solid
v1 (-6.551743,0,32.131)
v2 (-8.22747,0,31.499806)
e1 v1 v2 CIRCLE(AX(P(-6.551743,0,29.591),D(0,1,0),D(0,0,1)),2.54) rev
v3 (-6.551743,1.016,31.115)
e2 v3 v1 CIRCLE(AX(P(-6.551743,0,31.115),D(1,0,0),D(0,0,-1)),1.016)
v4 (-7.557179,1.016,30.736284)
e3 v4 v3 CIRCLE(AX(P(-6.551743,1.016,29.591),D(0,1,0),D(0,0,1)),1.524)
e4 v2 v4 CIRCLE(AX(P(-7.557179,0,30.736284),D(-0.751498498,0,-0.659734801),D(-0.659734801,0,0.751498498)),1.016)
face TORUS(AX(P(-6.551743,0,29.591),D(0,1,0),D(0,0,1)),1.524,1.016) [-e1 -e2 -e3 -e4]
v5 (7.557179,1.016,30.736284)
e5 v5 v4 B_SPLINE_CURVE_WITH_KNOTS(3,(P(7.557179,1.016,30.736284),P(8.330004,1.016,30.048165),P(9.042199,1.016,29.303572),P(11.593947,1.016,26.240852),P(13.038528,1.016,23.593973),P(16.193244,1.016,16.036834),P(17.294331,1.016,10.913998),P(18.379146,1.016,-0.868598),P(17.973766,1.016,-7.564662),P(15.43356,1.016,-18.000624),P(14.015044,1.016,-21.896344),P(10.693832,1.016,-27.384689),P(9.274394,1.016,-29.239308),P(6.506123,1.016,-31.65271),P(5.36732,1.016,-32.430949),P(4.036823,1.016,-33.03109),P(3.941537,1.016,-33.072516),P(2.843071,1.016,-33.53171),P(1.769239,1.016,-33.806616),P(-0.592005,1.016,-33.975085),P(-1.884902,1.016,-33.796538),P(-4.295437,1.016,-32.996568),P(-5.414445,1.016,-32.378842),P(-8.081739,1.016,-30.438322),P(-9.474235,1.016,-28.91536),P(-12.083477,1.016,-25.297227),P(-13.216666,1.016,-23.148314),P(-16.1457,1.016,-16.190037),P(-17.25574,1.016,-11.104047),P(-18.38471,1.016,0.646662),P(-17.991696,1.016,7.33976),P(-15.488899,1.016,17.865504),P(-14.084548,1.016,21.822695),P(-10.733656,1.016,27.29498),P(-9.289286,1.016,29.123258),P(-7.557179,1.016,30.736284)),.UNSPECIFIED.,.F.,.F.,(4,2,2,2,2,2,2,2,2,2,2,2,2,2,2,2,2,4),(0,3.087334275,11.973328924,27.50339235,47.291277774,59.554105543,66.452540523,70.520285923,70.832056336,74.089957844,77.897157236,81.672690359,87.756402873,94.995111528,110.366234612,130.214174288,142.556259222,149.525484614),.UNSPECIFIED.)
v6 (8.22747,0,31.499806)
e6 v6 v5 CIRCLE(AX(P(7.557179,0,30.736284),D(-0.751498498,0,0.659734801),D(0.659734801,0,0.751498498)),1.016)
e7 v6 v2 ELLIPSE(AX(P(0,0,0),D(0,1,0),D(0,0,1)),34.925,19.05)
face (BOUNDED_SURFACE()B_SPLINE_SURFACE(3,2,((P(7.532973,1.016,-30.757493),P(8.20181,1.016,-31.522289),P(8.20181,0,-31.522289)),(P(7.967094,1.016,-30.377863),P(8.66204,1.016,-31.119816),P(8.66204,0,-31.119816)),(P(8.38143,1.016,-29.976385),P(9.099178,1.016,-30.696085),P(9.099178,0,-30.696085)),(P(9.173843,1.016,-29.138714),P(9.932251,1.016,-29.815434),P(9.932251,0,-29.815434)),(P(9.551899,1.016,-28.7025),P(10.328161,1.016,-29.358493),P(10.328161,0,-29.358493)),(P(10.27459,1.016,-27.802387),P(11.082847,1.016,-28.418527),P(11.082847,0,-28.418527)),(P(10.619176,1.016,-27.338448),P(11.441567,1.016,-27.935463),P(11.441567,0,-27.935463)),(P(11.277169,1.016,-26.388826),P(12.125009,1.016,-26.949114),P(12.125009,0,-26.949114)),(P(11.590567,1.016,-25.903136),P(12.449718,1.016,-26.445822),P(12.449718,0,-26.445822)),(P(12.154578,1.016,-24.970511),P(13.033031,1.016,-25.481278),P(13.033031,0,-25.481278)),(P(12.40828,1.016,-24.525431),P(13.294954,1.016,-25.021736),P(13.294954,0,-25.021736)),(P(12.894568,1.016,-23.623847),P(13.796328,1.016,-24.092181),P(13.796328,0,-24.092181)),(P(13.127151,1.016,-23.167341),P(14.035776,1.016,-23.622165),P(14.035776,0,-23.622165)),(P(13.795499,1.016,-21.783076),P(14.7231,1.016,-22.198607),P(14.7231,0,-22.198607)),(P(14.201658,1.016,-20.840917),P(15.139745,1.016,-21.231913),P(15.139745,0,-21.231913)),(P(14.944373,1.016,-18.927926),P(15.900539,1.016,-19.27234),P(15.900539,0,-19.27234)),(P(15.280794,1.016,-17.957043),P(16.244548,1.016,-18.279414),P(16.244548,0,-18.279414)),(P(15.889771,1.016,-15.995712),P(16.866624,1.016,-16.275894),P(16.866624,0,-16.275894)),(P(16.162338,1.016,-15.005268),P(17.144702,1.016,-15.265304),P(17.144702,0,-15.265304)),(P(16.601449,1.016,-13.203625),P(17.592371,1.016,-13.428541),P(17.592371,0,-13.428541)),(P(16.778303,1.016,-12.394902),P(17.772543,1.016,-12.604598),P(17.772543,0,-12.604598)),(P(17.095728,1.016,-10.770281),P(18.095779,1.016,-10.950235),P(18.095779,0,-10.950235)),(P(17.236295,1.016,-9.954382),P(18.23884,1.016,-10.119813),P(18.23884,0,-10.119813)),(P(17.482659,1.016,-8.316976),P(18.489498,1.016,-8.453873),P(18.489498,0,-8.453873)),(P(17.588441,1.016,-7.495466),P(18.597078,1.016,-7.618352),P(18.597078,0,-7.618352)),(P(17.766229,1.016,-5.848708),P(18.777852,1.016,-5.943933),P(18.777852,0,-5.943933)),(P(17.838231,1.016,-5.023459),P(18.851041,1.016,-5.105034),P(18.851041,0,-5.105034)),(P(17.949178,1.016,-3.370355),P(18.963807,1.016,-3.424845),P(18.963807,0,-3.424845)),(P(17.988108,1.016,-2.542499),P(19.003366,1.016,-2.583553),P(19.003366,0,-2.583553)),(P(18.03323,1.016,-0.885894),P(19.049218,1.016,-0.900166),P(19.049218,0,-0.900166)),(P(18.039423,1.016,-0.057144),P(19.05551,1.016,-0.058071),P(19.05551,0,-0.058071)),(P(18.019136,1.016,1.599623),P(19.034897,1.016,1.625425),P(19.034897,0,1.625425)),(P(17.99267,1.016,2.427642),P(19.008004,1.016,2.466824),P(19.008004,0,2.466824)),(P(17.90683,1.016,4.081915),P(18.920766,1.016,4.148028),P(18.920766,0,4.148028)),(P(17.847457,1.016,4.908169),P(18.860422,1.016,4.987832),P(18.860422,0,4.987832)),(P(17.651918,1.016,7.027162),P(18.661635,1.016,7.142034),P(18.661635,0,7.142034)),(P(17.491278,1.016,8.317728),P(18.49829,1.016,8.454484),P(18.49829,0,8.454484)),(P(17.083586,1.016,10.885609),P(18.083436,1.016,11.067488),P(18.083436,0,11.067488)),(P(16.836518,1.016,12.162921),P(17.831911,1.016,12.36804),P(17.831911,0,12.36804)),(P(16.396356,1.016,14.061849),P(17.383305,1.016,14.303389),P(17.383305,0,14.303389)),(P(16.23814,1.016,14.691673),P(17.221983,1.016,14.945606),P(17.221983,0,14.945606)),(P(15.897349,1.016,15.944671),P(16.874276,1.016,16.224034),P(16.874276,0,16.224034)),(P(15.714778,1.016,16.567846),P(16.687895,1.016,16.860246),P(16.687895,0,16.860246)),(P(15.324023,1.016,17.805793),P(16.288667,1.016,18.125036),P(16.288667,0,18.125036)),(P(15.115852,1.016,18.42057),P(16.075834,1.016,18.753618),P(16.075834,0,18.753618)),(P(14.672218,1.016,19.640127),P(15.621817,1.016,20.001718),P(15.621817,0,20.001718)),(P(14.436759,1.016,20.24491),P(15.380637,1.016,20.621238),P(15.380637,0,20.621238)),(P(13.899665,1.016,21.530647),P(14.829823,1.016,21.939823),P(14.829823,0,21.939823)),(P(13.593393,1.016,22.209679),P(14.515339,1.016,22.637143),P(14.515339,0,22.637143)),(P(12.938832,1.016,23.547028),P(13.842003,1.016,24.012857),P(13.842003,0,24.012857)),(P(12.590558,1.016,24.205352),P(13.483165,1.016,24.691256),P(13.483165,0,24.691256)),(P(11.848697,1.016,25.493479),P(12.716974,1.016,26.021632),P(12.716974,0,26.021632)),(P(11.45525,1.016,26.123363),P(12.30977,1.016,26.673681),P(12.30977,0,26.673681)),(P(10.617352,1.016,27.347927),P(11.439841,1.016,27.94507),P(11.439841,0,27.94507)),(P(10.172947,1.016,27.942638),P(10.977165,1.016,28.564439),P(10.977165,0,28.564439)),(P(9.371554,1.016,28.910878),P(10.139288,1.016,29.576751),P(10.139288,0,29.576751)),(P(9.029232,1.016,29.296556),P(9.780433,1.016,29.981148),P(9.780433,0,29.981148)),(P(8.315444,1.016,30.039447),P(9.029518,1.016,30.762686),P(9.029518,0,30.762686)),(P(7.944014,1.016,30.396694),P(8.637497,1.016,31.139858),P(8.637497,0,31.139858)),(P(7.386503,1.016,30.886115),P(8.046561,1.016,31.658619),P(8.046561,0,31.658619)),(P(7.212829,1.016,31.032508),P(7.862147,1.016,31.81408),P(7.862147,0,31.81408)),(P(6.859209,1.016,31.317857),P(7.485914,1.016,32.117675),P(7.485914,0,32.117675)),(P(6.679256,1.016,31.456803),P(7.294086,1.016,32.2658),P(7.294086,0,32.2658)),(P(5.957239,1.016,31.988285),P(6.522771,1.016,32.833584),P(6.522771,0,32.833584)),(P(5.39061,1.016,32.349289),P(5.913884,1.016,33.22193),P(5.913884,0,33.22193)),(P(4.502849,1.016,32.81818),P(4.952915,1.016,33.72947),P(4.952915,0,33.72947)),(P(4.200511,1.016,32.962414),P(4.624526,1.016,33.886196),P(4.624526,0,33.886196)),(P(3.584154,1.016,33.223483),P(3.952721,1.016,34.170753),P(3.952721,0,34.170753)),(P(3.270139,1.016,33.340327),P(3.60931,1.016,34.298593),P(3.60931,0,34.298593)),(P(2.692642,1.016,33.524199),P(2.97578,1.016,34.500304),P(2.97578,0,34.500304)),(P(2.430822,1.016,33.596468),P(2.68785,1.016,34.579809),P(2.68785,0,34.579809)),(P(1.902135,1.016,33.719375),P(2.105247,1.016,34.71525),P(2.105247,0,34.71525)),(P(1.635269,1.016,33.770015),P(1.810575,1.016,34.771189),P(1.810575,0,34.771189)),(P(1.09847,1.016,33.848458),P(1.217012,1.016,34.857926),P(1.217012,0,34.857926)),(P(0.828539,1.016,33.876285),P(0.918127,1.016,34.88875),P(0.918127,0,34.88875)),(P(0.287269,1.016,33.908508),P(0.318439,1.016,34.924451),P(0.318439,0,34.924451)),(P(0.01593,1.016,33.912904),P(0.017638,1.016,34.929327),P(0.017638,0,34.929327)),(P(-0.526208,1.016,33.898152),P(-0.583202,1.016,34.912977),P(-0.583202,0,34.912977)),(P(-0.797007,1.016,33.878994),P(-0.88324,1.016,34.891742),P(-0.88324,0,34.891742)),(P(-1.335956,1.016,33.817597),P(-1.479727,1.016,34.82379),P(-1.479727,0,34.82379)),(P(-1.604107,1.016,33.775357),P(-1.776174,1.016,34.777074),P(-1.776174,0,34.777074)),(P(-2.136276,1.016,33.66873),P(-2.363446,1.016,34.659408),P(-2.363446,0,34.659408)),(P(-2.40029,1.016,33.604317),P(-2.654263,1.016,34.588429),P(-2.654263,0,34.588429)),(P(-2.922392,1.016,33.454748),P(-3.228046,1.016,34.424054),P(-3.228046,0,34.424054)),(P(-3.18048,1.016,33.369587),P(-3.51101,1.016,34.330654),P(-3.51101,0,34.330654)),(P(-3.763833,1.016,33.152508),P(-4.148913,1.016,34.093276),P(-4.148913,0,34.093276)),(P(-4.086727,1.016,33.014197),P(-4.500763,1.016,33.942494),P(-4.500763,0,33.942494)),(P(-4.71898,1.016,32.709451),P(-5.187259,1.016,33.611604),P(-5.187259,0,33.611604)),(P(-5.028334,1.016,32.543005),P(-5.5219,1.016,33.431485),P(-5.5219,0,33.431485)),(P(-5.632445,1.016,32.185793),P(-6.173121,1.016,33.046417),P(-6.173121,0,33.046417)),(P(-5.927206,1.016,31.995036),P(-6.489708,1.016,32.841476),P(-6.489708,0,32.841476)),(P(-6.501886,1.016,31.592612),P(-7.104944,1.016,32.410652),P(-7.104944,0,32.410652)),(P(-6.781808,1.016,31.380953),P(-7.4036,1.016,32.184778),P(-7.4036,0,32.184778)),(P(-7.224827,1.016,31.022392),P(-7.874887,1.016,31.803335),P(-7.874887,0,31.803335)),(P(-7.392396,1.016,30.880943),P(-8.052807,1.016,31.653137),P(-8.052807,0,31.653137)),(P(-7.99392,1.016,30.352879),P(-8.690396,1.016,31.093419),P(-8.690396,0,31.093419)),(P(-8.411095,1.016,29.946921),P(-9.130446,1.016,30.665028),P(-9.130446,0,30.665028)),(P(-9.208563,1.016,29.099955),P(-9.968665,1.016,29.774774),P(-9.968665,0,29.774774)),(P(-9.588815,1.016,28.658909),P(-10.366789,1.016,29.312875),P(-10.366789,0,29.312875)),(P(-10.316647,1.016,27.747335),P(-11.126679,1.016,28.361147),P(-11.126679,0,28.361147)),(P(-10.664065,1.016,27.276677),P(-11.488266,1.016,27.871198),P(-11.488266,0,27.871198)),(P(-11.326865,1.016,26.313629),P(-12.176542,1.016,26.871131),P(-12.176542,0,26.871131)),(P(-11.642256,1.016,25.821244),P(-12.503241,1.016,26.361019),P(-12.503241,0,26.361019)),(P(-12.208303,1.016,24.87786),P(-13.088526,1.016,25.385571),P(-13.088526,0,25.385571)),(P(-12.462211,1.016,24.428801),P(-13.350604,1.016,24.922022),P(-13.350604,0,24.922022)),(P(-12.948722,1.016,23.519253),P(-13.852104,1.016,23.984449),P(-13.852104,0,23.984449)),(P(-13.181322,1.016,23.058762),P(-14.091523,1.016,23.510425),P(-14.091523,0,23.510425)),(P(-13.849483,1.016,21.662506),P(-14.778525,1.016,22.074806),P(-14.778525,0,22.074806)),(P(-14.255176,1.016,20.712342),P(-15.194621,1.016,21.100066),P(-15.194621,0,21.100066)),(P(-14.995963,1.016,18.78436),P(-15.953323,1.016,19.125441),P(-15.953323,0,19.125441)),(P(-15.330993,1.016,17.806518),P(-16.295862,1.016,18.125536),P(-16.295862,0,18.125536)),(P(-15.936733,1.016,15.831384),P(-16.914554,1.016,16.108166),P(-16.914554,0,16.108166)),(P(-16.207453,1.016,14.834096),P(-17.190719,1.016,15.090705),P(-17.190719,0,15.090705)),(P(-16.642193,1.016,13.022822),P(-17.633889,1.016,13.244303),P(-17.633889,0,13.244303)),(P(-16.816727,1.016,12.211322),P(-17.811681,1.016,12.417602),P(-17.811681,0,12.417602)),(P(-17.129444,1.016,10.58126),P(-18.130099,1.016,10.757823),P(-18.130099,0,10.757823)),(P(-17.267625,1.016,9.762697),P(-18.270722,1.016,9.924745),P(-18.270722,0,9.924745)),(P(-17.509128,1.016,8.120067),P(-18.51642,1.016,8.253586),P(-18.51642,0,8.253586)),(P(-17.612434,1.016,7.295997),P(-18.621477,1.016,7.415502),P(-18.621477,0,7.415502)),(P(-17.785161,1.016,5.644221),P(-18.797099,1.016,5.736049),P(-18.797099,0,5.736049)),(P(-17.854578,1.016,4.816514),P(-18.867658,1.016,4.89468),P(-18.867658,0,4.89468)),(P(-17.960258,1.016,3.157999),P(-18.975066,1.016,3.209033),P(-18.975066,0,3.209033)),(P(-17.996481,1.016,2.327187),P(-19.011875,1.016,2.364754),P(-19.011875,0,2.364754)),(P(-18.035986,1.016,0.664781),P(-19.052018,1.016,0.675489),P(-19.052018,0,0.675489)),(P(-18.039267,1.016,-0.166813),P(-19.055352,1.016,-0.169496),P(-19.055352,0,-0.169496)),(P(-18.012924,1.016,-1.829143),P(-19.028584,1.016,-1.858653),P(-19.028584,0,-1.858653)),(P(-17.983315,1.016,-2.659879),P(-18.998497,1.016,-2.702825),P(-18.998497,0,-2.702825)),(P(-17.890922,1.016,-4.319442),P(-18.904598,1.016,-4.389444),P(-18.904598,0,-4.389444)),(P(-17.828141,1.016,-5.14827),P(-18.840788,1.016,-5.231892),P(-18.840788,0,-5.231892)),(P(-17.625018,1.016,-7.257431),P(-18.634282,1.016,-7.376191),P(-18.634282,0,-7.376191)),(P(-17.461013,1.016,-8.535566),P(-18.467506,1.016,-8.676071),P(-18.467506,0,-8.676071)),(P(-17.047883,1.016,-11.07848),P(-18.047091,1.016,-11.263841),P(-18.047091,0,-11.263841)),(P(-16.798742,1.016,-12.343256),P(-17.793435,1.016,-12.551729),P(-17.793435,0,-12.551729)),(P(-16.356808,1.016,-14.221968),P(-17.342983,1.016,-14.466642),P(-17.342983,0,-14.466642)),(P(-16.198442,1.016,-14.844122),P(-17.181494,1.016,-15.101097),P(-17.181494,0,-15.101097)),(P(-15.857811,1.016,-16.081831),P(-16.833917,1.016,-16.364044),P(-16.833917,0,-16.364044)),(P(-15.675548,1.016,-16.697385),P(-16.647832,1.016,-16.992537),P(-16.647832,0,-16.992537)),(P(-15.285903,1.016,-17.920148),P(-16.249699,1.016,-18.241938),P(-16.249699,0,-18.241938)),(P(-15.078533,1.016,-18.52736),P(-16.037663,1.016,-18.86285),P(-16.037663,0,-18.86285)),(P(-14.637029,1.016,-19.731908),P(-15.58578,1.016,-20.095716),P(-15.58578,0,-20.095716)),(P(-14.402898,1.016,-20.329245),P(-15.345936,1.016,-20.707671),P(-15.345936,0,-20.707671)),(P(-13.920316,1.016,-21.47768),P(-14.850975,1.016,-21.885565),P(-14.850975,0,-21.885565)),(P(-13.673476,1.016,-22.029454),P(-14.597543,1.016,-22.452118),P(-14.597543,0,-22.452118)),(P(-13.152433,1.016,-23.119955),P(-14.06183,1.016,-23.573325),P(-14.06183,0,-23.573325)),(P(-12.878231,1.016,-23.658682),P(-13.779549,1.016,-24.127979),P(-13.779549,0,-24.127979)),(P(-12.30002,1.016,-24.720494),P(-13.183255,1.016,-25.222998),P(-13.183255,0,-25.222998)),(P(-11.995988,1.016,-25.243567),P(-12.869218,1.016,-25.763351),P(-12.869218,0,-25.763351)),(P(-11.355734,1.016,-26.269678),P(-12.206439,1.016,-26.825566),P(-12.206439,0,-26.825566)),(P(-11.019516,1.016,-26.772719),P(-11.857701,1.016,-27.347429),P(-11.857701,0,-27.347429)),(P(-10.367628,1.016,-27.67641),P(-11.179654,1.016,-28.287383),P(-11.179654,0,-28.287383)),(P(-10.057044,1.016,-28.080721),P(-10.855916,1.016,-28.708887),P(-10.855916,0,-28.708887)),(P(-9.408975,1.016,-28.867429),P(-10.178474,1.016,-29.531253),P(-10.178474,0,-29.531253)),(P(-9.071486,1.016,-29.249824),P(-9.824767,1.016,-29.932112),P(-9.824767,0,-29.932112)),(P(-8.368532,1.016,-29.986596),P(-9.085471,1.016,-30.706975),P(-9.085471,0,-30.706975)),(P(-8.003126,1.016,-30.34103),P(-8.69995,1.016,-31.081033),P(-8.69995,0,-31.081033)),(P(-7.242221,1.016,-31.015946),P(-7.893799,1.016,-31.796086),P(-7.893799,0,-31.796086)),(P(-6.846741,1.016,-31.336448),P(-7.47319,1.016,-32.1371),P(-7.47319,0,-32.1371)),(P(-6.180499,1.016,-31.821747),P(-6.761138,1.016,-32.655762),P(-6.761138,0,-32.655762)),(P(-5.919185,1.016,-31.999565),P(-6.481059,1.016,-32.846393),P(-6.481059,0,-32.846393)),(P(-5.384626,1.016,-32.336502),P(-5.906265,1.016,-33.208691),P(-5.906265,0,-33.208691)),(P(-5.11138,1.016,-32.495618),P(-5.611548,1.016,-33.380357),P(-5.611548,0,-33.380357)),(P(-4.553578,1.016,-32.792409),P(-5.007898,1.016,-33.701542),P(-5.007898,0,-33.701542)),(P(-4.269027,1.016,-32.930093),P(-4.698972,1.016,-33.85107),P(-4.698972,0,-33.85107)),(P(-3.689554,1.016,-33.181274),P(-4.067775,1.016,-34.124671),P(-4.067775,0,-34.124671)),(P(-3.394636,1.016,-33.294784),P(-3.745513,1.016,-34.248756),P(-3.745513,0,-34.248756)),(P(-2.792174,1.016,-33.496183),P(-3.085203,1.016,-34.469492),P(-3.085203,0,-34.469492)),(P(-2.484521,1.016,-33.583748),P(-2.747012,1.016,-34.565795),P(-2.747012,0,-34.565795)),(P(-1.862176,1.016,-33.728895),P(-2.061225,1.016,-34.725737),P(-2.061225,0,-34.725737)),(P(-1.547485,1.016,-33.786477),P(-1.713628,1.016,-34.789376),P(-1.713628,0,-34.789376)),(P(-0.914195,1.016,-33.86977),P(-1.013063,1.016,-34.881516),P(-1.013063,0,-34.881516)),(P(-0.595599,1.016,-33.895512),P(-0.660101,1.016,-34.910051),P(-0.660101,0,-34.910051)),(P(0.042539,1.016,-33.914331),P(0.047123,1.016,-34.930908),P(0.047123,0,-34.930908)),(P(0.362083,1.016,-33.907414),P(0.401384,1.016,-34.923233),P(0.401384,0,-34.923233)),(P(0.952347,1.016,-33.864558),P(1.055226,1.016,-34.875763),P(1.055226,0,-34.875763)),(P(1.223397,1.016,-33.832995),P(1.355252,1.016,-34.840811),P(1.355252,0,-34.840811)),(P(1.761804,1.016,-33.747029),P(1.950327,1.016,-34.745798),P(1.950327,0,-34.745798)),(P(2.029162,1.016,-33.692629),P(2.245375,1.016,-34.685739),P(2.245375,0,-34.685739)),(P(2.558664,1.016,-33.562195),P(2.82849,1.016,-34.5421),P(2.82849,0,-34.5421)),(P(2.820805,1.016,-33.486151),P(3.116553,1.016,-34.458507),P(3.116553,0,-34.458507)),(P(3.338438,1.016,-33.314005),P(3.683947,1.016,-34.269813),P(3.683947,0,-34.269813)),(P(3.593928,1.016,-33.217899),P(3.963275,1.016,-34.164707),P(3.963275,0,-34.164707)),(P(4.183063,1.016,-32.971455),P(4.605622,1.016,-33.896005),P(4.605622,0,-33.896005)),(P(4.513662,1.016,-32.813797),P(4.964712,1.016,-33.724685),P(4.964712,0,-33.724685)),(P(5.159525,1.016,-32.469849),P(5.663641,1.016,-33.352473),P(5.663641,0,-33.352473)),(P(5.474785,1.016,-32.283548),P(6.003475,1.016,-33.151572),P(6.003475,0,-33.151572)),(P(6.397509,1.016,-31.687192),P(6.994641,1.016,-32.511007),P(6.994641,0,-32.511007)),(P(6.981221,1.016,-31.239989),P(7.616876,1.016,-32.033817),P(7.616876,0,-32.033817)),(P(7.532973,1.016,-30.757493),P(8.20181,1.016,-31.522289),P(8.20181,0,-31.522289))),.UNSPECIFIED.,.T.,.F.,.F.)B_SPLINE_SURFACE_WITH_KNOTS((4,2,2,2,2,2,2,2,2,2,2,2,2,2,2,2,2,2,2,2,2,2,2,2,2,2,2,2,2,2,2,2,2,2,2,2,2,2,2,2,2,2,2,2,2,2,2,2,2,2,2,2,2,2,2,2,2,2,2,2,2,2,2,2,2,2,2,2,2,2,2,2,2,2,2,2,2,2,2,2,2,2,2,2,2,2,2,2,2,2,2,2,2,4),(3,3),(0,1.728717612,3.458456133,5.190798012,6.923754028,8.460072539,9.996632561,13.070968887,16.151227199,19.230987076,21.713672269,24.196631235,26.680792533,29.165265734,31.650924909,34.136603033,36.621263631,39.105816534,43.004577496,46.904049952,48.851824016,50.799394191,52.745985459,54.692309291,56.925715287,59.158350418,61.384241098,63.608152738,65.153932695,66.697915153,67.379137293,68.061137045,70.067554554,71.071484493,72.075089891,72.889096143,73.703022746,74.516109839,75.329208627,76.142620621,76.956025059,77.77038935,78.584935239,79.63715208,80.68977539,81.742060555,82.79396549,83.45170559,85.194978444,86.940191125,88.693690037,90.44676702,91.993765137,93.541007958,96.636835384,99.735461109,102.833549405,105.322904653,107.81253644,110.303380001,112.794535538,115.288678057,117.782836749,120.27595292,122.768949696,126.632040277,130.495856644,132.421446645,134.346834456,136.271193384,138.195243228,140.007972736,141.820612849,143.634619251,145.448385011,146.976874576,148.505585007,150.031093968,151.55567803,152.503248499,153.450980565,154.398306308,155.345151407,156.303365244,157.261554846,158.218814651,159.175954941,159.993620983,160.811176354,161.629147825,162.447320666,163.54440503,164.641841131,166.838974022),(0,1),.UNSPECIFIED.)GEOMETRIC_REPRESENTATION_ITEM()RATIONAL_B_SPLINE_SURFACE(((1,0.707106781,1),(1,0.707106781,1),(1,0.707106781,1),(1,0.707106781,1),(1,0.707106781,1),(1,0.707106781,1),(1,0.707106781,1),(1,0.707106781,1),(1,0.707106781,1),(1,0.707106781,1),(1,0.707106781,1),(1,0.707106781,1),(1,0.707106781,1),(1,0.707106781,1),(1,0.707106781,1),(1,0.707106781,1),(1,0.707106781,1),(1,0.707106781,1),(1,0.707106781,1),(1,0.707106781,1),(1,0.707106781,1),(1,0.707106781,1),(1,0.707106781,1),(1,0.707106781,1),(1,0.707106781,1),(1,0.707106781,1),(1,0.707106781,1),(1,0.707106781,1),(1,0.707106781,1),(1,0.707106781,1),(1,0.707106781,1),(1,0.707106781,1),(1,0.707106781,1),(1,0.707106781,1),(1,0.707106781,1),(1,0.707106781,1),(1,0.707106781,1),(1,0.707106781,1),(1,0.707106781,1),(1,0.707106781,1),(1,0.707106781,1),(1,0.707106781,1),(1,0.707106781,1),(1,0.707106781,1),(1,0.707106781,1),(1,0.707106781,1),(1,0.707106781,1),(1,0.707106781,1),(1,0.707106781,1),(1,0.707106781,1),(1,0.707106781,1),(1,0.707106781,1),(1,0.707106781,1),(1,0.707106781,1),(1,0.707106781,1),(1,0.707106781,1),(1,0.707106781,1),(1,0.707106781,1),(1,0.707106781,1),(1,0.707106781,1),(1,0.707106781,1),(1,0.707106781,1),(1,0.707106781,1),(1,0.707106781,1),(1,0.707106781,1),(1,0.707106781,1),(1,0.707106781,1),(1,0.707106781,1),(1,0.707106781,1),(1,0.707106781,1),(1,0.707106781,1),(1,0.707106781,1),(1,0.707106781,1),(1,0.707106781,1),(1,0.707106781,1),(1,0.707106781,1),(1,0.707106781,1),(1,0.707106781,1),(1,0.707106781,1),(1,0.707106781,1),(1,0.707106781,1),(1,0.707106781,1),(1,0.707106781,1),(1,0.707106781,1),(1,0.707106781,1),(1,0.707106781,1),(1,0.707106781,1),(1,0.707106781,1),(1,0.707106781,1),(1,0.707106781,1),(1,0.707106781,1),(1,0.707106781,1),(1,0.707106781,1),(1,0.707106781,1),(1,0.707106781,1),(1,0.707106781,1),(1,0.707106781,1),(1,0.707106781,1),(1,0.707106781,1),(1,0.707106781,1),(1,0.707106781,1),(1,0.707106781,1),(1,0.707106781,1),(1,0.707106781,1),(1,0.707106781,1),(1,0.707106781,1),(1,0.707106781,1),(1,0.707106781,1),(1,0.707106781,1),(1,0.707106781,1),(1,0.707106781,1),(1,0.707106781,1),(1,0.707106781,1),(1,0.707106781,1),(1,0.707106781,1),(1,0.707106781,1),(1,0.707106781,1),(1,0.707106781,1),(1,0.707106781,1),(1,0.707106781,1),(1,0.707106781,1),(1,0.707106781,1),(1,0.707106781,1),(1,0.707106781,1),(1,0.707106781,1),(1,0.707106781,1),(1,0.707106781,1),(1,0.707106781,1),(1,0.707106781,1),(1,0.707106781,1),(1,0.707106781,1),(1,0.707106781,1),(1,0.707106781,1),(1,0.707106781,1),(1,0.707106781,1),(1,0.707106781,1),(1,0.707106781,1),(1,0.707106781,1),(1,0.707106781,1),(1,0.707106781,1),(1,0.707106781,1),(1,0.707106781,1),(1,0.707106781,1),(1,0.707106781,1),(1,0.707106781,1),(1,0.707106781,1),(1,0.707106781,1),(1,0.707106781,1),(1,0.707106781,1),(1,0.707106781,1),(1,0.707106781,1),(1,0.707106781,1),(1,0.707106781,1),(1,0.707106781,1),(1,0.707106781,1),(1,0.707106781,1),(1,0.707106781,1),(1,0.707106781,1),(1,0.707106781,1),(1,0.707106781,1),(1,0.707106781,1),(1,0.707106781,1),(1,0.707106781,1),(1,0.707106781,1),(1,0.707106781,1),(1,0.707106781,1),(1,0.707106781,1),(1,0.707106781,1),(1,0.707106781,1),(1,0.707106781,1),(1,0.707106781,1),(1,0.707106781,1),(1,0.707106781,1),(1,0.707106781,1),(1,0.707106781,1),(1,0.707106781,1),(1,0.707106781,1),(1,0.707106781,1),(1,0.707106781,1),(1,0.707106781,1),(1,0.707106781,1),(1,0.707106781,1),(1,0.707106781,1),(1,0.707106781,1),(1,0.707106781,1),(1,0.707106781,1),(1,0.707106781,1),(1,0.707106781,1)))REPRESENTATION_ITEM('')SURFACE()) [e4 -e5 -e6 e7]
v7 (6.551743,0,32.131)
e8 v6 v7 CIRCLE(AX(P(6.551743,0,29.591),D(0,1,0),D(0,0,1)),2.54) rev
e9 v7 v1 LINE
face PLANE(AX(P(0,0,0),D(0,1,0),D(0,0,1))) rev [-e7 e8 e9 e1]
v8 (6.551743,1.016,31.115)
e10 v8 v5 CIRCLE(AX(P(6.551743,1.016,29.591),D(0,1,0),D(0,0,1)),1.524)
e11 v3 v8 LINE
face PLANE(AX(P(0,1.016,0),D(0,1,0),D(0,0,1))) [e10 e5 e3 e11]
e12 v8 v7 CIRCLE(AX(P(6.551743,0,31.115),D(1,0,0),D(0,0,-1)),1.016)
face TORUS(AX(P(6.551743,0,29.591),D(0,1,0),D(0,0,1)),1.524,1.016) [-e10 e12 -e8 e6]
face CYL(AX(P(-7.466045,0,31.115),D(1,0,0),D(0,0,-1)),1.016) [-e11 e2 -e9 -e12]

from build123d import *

# Parameters (mm, degrees)
SKETCH1_RX          = 34.925
SKETCH1_RY          = 19.05
BOSS_EXTRUDE1_DEPTH = 1.016
CUT_EXTRUDE1_DEPTH  = 40.795607559
FILLET1_R           = 2.54
FILLET2_R           = 1.016


with BuildPart() as part:
    # Sketch1 → Boss-Extrude1 (new body)
    with BuildSketch(Plane(origin=(0, 0, 0), x_dir=(1, 0, 0), z_dir=(0, 1, 0))):
        with Locations(Location((0, 0), (0, 0, -90))):
            Ellipse(SKETCH1_RX, SKETCH1_RY)
    extrude(amount=BOSS_EXTRUDE1_DEPTH)

    # Sketch2 → Cut-Extrude1 (cut, through all)
    with BuildSketch(Plane(origin=(0, 1.016, 0), x_dir=(1, 0, 0), z_dir=(0, 1, 0))):
        with BuildLine():
            Line((-7.466044736, -32.131), (7.466044736, -32.131))
            add(Edge.make_bspline(
                [(-7.466044736, -32.131), (0, -37.961956522), (7.466044736, -32.131)],
                knots=[5.880469466, 5.880469466, 5.880469466, 6.685901149, 6.685901149, 6.685901149], degree=2, weights=[1, 0.92, 1]))
        make_face()
    extrude(amount=-CUT_EXTRUDE1_DEPTH, mode=Mode.SUBTRACT)

    # Fillet1
    fillet1_edges = [part.edges().sort_by_distance(p)[0] for p in [
        (-7.466044736, 0.508, 32.131),
        (7.466044736, 0.508, 32.131),
    ]]
    fillet(fillet1_edges, radius=FILLET1_R)

    # Fillet2
    fillet2_edges = [part.edges().sort_by_distance(p)[0] for p in [
        (7.44707344, 1.016, 31.967969469),
        (-7.44707344, 1.016, 31.967969469),
        (0, 1.016, 32.131),
        (0, 1.016, -34.925),
    ]]
    fillet(fillet2_edges, radius=FILLET2_R - 0.0004)  # a hair under: the kernel refuses the full size


solid = part.part
